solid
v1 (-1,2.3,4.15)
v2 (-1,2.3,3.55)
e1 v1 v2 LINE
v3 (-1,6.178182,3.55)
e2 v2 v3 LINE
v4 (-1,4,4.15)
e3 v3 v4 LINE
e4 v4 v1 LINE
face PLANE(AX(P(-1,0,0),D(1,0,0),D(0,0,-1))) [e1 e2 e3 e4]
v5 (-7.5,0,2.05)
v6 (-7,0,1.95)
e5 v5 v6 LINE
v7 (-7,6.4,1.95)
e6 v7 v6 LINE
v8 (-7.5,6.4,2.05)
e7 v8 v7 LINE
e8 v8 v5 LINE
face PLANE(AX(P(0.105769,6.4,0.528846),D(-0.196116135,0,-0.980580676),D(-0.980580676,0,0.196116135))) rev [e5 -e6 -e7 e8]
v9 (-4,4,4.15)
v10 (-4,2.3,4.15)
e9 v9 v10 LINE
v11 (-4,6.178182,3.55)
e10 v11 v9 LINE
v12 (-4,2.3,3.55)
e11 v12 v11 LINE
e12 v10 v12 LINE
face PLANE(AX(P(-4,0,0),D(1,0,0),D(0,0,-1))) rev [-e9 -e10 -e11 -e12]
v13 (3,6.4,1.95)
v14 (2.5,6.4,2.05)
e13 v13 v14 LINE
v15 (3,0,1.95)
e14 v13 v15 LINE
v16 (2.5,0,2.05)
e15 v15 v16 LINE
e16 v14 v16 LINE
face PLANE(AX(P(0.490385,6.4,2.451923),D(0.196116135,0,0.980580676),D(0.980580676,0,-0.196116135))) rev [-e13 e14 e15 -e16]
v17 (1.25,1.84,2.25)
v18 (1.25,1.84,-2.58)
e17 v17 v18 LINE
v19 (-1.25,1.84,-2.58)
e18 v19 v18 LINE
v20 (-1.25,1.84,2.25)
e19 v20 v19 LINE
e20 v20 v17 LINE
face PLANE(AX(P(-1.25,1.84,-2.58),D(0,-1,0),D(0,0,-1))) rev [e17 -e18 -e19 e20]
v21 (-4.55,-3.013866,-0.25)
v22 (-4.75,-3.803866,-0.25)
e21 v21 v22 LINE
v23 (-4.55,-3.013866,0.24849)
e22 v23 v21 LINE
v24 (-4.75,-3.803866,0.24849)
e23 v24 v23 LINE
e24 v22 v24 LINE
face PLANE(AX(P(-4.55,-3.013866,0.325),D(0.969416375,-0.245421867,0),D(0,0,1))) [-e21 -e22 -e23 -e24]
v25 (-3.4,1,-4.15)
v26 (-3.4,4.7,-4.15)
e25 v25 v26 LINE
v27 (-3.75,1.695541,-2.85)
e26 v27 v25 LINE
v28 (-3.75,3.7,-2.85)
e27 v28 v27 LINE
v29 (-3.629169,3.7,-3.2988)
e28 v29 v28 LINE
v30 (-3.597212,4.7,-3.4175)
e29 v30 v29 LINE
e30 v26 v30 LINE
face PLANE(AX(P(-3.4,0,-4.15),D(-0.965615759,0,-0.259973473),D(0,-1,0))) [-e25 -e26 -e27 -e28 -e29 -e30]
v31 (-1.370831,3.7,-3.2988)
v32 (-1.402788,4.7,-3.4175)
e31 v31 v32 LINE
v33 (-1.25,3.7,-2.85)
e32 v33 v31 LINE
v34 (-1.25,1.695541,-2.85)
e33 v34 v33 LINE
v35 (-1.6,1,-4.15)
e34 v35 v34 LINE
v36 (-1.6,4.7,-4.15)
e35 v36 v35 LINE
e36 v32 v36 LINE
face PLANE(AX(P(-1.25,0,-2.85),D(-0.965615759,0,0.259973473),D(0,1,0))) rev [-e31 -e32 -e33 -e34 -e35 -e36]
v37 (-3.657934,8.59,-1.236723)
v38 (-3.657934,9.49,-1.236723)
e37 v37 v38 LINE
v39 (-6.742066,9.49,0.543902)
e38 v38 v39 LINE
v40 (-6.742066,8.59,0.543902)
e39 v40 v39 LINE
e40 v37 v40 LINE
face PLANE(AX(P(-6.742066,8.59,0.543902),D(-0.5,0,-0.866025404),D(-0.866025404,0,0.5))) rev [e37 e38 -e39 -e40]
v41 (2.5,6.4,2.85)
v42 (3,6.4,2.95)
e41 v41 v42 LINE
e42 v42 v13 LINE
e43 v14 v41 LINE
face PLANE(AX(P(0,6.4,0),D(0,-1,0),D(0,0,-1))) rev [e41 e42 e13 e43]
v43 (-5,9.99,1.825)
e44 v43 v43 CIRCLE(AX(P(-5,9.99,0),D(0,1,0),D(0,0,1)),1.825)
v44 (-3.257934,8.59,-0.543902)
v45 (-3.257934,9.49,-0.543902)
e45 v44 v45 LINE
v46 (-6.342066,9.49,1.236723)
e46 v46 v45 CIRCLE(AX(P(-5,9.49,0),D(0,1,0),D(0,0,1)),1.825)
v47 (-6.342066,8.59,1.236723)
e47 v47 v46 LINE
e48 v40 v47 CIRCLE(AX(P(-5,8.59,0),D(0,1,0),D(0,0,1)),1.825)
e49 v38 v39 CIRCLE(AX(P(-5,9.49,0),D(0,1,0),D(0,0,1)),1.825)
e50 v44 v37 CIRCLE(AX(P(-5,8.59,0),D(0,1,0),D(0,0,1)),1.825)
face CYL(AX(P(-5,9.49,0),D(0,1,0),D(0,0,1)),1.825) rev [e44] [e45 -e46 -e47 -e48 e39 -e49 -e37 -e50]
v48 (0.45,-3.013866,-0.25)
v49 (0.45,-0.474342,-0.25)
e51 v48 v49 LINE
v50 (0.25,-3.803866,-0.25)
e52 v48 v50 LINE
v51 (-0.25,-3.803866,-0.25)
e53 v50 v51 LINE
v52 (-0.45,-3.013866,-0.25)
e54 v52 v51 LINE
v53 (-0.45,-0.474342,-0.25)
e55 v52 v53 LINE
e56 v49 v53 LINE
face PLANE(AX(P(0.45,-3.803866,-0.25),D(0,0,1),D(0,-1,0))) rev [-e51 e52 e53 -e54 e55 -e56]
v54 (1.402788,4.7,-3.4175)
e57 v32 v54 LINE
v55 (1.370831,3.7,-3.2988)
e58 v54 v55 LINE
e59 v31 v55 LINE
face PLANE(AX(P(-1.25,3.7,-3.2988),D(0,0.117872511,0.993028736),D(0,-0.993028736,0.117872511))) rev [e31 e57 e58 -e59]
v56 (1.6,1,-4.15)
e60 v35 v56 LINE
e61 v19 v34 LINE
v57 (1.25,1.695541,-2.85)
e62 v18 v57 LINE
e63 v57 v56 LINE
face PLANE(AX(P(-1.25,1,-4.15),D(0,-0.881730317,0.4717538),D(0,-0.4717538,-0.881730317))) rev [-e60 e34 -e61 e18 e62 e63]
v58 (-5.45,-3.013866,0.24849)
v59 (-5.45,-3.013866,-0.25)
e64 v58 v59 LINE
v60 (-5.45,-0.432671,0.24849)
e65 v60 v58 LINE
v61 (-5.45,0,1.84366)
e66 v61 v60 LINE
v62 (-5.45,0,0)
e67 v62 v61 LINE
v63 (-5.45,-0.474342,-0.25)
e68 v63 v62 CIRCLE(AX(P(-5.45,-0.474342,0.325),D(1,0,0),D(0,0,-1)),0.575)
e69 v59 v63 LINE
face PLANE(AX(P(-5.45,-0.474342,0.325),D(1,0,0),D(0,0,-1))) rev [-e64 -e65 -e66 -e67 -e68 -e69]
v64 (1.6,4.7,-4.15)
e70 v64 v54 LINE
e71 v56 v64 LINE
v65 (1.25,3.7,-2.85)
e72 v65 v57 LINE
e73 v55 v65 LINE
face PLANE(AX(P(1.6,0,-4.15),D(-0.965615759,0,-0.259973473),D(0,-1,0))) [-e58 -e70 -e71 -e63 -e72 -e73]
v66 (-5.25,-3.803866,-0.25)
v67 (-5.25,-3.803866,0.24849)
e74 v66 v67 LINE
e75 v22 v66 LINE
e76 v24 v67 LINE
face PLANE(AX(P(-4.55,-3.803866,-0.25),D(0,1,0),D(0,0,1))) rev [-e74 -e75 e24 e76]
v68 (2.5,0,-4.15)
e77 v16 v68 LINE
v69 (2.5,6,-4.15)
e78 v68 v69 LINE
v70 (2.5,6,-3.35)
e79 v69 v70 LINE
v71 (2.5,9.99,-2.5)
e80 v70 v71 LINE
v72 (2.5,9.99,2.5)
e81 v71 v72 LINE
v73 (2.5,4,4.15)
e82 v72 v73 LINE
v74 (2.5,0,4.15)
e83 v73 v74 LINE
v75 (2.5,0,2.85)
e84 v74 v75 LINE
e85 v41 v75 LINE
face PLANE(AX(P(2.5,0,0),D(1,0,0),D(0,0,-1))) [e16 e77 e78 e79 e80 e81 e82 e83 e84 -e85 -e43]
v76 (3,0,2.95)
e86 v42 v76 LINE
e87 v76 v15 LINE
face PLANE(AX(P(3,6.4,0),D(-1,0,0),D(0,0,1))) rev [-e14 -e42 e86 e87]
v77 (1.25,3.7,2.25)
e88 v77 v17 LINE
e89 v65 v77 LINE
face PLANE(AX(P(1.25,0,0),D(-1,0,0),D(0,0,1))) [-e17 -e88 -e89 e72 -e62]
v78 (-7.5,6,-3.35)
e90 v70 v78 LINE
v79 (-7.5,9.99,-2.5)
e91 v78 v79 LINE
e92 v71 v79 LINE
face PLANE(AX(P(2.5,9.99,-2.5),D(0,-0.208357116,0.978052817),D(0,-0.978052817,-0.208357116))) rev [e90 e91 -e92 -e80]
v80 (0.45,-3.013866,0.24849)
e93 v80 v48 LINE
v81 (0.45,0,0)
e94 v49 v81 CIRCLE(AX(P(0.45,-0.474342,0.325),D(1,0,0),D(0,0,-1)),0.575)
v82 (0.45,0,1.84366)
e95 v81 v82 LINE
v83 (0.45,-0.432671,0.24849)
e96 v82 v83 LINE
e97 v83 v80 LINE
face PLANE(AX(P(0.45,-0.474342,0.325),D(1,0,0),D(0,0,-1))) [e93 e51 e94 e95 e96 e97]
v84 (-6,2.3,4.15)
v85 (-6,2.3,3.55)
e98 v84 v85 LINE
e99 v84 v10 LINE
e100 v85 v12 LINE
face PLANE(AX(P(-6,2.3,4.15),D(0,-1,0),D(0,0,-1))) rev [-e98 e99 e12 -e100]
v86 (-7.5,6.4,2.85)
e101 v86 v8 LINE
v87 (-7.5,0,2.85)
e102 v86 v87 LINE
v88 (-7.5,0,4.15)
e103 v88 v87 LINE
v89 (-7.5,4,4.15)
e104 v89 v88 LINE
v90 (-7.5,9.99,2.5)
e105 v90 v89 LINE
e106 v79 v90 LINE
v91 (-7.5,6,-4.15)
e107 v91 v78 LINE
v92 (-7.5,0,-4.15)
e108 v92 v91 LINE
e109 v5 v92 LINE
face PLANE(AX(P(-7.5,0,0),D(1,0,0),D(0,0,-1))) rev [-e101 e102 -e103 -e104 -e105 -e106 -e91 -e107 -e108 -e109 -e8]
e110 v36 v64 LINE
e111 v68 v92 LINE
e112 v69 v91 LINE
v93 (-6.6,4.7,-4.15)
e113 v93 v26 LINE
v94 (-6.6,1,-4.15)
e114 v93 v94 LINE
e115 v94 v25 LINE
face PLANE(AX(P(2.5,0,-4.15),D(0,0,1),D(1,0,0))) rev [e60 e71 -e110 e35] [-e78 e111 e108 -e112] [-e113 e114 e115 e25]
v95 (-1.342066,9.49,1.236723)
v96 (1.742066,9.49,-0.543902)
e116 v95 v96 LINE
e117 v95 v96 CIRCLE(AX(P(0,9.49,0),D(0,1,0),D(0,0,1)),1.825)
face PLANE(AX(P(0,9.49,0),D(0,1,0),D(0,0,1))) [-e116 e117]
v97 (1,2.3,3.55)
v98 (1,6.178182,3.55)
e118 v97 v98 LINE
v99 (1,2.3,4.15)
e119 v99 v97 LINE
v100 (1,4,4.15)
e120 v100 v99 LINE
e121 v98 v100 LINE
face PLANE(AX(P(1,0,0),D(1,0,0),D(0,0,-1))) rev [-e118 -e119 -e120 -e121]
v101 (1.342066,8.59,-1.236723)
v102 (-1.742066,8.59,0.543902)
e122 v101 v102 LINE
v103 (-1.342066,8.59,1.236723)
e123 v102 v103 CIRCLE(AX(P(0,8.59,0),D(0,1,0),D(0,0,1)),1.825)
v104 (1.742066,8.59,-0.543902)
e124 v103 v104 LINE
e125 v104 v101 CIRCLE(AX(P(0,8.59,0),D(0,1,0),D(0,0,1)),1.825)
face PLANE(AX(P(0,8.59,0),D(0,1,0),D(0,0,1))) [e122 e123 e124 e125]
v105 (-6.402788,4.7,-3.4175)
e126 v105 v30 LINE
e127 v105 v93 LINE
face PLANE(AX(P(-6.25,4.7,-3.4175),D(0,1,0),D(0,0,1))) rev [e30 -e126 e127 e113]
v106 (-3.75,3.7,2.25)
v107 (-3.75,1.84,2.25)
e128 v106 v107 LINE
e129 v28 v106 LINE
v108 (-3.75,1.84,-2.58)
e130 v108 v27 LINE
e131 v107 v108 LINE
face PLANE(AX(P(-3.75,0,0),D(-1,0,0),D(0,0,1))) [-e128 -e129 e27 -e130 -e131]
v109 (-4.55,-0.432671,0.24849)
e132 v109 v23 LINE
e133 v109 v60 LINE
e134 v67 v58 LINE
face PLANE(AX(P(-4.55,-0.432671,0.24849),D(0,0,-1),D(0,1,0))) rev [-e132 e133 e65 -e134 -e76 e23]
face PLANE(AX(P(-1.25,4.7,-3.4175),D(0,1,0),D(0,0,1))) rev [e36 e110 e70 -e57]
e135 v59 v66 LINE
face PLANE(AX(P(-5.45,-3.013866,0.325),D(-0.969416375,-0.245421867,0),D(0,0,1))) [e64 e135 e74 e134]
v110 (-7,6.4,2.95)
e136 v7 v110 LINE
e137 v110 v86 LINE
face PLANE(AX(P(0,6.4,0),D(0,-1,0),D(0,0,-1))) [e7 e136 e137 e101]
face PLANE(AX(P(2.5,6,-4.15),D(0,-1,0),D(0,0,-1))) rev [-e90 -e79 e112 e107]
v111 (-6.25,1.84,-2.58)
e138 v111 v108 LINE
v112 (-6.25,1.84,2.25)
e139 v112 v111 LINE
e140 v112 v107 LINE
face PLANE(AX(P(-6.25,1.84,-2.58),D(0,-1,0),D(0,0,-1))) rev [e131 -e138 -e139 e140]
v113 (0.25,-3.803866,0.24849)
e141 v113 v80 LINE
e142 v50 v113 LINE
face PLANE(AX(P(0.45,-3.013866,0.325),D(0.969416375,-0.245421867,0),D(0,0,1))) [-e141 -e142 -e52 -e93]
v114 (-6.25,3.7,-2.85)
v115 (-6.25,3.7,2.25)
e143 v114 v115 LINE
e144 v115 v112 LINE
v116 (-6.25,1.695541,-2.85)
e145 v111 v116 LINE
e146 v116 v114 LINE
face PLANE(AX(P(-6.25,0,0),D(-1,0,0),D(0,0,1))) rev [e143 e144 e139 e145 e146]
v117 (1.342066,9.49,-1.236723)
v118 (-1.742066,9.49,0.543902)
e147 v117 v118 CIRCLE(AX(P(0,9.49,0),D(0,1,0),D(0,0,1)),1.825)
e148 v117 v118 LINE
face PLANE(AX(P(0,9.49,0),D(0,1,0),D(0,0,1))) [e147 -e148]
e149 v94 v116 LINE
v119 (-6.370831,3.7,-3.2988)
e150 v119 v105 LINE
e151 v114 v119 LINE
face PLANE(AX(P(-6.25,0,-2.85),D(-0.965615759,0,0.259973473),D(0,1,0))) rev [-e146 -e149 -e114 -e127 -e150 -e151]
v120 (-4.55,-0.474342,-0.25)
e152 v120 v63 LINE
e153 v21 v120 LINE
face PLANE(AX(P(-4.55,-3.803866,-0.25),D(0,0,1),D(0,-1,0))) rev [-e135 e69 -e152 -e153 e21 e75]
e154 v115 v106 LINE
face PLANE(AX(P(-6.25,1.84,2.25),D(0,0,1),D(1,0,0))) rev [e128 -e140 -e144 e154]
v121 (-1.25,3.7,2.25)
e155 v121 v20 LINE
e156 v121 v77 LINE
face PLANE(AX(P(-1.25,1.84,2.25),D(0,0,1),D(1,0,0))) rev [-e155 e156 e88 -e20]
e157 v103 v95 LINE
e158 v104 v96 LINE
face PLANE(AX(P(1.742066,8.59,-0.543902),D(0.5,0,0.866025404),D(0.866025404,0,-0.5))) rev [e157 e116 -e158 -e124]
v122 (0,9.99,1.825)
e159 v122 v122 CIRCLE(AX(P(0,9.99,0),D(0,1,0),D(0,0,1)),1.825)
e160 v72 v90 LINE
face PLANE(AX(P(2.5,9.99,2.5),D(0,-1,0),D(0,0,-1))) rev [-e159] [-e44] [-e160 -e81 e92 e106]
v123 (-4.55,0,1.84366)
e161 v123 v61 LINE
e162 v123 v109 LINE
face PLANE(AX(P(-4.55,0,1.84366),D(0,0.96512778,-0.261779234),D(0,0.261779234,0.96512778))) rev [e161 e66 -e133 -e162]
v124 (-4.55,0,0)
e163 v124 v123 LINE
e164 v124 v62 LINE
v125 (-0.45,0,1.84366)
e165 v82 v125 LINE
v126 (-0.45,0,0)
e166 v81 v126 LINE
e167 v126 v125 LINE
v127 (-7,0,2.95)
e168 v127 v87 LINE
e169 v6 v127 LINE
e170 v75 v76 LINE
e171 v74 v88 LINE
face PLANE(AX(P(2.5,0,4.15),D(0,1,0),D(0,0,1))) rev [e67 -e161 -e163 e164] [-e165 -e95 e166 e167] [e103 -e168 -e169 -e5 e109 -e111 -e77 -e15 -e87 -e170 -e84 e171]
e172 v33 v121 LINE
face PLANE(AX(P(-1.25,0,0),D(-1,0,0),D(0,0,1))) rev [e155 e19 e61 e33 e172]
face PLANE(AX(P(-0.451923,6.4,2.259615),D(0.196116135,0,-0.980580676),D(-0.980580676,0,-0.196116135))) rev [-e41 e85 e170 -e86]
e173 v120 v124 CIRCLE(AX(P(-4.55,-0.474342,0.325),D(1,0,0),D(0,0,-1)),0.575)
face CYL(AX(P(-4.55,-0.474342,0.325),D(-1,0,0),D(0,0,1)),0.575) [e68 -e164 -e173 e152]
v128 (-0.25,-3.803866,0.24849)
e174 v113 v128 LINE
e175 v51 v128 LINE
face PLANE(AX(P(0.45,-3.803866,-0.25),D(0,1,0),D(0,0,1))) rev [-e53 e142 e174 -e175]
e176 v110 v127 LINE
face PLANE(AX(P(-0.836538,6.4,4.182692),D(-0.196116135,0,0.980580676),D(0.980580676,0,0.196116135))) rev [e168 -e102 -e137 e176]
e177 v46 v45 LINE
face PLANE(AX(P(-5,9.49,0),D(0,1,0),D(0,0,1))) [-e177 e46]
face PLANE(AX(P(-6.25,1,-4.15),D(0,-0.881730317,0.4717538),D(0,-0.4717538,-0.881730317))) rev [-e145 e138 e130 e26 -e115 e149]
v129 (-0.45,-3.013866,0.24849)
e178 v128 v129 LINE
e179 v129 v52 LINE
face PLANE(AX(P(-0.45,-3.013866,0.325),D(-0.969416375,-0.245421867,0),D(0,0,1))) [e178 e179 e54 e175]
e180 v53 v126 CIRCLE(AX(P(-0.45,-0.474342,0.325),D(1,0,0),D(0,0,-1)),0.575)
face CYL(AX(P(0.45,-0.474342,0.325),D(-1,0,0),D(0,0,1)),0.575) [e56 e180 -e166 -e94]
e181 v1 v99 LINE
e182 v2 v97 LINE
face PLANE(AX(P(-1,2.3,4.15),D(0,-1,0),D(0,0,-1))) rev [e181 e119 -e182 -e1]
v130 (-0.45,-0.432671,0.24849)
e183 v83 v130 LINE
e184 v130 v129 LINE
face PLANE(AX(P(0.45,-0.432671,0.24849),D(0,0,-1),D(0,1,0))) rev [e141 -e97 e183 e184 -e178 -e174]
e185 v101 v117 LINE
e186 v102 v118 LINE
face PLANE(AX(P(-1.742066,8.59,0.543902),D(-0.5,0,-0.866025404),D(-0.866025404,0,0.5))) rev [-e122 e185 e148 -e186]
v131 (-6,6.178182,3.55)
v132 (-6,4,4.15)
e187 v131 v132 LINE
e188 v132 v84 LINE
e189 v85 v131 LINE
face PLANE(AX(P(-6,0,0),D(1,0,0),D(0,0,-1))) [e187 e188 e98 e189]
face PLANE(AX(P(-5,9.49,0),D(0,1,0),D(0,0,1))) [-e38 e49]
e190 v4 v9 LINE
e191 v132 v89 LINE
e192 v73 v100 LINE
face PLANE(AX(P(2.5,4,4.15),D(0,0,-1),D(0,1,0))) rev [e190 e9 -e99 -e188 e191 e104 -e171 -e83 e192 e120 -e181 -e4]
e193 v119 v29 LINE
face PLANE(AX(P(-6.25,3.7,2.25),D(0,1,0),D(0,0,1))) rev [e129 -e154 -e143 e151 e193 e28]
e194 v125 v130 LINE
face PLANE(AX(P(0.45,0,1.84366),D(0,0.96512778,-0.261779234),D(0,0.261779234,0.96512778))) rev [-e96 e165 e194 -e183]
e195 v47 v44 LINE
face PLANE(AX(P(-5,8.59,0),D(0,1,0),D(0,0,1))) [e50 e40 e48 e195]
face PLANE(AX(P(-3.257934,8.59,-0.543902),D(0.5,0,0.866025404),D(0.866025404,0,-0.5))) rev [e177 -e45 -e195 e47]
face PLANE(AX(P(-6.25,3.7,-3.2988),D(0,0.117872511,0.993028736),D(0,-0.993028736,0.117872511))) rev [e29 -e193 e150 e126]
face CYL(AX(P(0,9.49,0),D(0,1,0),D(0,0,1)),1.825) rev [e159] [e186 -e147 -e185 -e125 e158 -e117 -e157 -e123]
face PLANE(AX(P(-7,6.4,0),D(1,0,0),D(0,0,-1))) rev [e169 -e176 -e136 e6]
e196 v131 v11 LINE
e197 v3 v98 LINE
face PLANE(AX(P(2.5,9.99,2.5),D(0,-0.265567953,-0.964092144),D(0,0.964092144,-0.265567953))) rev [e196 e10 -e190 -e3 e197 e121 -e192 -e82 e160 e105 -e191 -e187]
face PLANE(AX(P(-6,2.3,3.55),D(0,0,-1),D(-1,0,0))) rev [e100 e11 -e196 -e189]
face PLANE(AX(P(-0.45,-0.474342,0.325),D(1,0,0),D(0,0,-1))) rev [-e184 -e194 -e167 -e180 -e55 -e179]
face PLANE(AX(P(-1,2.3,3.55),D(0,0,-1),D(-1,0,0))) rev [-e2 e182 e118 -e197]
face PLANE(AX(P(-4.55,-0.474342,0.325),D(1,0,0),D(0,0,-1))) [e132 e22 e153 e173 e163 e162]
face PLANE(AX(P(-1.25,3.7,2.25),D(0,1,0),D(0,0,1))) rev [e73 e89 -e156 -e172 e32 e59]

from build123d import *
from build123d.topology import SkipClean

# Parameters (mm, degrees)
BOSS_EXTRUDE1_DEPTH = 2.5
CUT_EXTRUDE1_DEPTH  = 1.25
CHAMFER1_SIZE       = 0.35
CHAMFER1_SIZE_2     = 1.3
CUT_EXTRUDE2_DEPTH  = 1
SKETCH5_R           = 1.825
CUT_EXTRUDE3_DEPTH  = 0.5
CUT_EXTRUDE4_DEPTH  = 0.9
BOSS_EXTRUDE3_DEPTH = 0.45
CHAMFER2_SIZE       = 0.2
CHAMFER2_SIZE2      = 0.79
MIRROR1_START       = -1.36978926
MIRROR1_OUTLINE_W   = 4
MIRROR1_OUTLINE_H   = 0.498489558
MIRROR1_DEPTH       = 0.193883275
LPATTERN1_COUNT     = 2
LPATTERN1_PITCH     = 5
BOSS_EXTRUDE2_DEPTH = 6.4
CUT_EXTRUDE5_DEPTH  = 6.4


# Read off the part's stored shape, not the designer's step: Mirror1
with BuildPart() as part:
    # Sketch2 → Boss-Extrude1 (new, symmetric)
    with BuildSketch(Plane(origin=(0, 0, 0), x_dir=(0, 0, -1), z_dir=(1, 0, 0))):
        Polygon((-4.15, 4), (-4.15, 0), (4.15, 0), (4.15, 6), (3.35, 6), (2.5, 9.99), (-2.5, 9.99), align=None)
    extrude(amount=BOSS_EXTRUDE1_DEPTH, both=True)

    # Sketch3 → Cut-Extrude1 (cut, symmetric)
    with BuildSketch(Plane(origin=(0, 0, 0), x_dir=(0, 0, -1), z_dir=(1, 0, 0))):
        Polygon((4.15, 1), (2.58, 1.84), (-2.25, 1.84), (-2.25, 3.7), (3.2988, 3.7), (3.4175, 4.7), (4.15, 4.7), align=None)
    extrude(amount=CUT_EXTRUDE1_DEPTH, both=True, mode=Mode.SUBTRACT)

    # Chamfer1
    # the kernel refuses this chamfer: 1.3, 0.35 mm, written as the material it takes off along each edge
    with BuildSketch(Plane(origin=(1.25, 4.7, -4.15), x_dir=(0.9905947308102195, 0, -0.1368286493795385), z_dir=(0, -1, 0))) as chamfer1_piece_1_section:
        Polygon((CHAMFER1_SIZE * 0.99059473081, CHAMFER1_SIZE * 0.13682864938), (-CHAMFER1_SIZE_2 * 0.13682864938, CHAMFER1_SIZE_2 * 0.99059473081), (0, 0), align=None)
    chamfer1_piece_1 = extrude(amount=7.075699234, mode=Mode.PRIVATE)
    chamfer1_piece_1 = split(chamfer1_piece_1, bisect_by=Plane(origin=(1.398374335, 1.802145787, -2.650751327), z_dir=(0, 0.8817303170442501, -0.47175380020201896)), keep=Keep.TOP, mode=Mode.PRIVATE)
    chamfer1_piece_1 = split(chamfer1_piece_1, bisect_by=Plane(origin=(1.398374335, 4.303686728, -3.370457615), z_dir=(0, -0.11787251100077023, -0.9930287363165143)), keep=Keep.TOP, mode=Mode.PRIVATE)
    add(chamfer1_piece_1, mode=Mode.SUBTRACT)
    with BuildSketch(Plane(origin=(1.25, 8.075699234, -4.15), x_dir=(0.9905947308102195, 0, -0.1368286493795385), z_dir=(0, -1, 0))) as chamfer1_piece_2_section:
        Polygon((CHAMFER1_SIZE * 0.99059473081, CHAMFER1_SIZE * 0.13682864938), (-CHAMFER1_SIZE_2 * 0.13682864938, CHAMFER1_SIZE_2 * 0.99059473081), (0, 0), align=None)
    chamfer1_piece_2 = extrude(amount=10.451398467, mode=Mode.PRIVATE)
    chamfer1_piece_2 = split(chamfer1_piece_2, bisect_by=Plane(origin=(1.281910217, 1.867643019, -2.528333882), z_dir=(0, 0.8817303170442501, -0.47175380020201896)), keep=Keep.TOP, mode=Mode.PRIVATE)
    chamfer1_piece_2 = split(chamfer1_piece_2, bisect_by=Plane(origin=(1.281910217, 3.7, -3.087047323), z_dir=(0, -1, 0)), keep=Keep.TOP, mode=Mode.PRIVATE)
    add(chamfer1_piece_2, mode=Mode.SUBTRACT)
    with BuildSketch(Plane(origin=(-1.25, 4.7, -4.15), x_dir=(-0.9905947308102195, 0, -0.1368286493795385), z_dir=(0, -1, 0))) as chamfer1_piece_3_section:
        Polygon((CHAMFER1_SIZE * 0.99059473081, -CHAMFER1_SIZE * 0.13682864938), (-CHAMFER1_SIZE_2 * 0.13682864938, -CHAMFER1_SIZE_2 * 0.99059473081), (0, 0), align=None)
    chamfer1_piece_3 = extrude(amount=7.075699234, mode=Mode.PRIVATE)
    chamfer1_piece_3 = split(chamfer1_piece_3, bisect_by=Plane(origin=(-1.398374335, 1.802145787, -2.650751327), z_dir=(0, 0.8817303170442501, -0.47175380020201896)), keep=Keep.TOP, mode=Mode.PRIVATE)
    chamfer1_piece_3 = split(chamfer1_piece_3, bisect_by=Plane(origin=(-1.398374335, 4.303686728, -3.370457615), z_dir=(0, -0.11787251100077023, -0.9930287363165143)), keep=Keep.TOP, mode=Mode.PRIVATE)
    add(chamfer1_piece_3, mode=Mode.SUBTRACT)
    with BuildSketch(Plane(origin=(-1.25, 8.075699234, -4.15), x_dir=(-0.9905947308102195, 0, -0.1368286493795385), z_dir=(0, -1, 0))) as chamfer1_piece_4_section:
        Polygon((CHAMFER1_SIZE * 0.99059473081, -CHAMFER1_SIZE * 0.13682864938), (-CHAMFER1_SIZE_2 * 0.13682864938, -CHAMFER1_SIZE_2 * 0.99059473081), (0, 0), align=None)
    chamfer1_piece_4 = extrude(amount=10.451398467, mode=Mode.PRIVATE)
    chamfer1_piece_4 = split(chamfer1_piece_4, bisect_by=Plane(origin=(-1.281910217, 1.867643019, -2.528333882), z_dir=(0, 0.8817303170442501, -0.47175380020201896)), keep=Keep.TOP, mode=Mode.PRIVATE)
    chamfer1_piece_4 = split(chamfer1_piece_4, bisect_by=Plane(origin=(-1.281910217, 3.7, -3.087047323), z_dir=(0, -1, 0)), keep=Keep.TOP, mode=Mode.PRIVATE)
    add(chamfer1_piece_4, mode=Mode.SUBTRACT)

    # Sketch4 → Cut-Extrude2 (cut, symmetric)
    with BuildSketch(Plane(origin=(0, 0, 0), x_dir=(0, 0, -1), z_dir=(1, 0, 0))):
        Polygon((-4.15, 2.3), (-3.55, 2.3), (-3.55, 6.178181818), (-4.15, 4), align=None)
    extrude(amount=CUT_EXTRUDE2_DEPTH, both=True, mode=Mode.SUBTRACT)

    # Sketch5 → Cut-Extrude3 (cut)
    with BuildSketch(Plane(origin=(0, 9.99, 0), x_dir=(1, 0, 0), z_dir=(0, 1, 0))):
        with Locations(Location((0, 0, 0), (0, 0, 270))):
            Circle(SKETCH5_R)
    extrude(amount=-CUT_EXTRUDE3_DEPTH, mode=Mode.SUBTRACT)

    # Sketch6 → Cut-Extrude4 (cut)
    with SkipClean():  # the faces are left unmerged after this step: merging them gives an invalid solid
        with BuildSketch(Plane(origin=(0, 9.49, 0), x_dir=(1, 0, 0), z_dir=(0, 1, 0))):
            with BuildLine():
                Line((-1.74206639, -0.543902284), (1.34206639, 1.236722607))
                ThreePointArc((1.34206639, 1.236722607), (1.580496362, 0.9125), (1.74206639, 0.543902284))
                Line((1.74206639, 0.543902284), (-1.34206639, -1.236722607))
                ThreePointArc((-1.34206639, -1.236722607), (-1.580496362, -0.9125), (-1.74206639, -0.543902284))
            make_face()
        extrude(amount=-CUT_EXTRUDE4_DEPTH, mode=Mode.SUBTRACT)

    # Sketch9 → Boss-Extrude3 (add, symmetric)
    with SkipClean():  # the faces are left unmerged after this step: merging them gives an invalid solid
        with BuildSketch(Plane(origin=(0, 0, 0), x_dir=(0, 0, -1), z_dir=(1, 0, 0))):
            with BuildLine():
                Line((0.25, -3.803865983), (-0.248489558, -3.803865983))
                Line((-0.248489558, -3.803865983), (-0.248489558, -0.432670696))
                Line((-0.248489558, -0.432670696), (-1.843660044, 0))
                Line((-1.843660044, 0), (0, 0))
                ThreePointArc((0, 0), (0.183674749, -0.206246517), (0.25, -0.474341649))
                Line((0.25, -0.474341649), (0.25, -3.803865983))
            make_face()
        extrude(amount=BOSS_EXTRUDE3_DEPTH, both=True)

    # Chamfer2
    chamfer2_edges = [part.edges().sort_by_distance(p)[0] for p in [
        (0.45, -3.803865983, -0.000755221),
    ]]
    chamfer2_side = [part.faces().sort_by_distance(p)[0] for p in [
        (0, -3.803865983, -0.000755221),
    ]]
    chamfer(chamfer2_edges, length=CHAMFER2_SIZE, length2=CHAMFER2_SIZE2, reference=chamfer2_side[0])

    # Mirror1 outline → Mirror1 (cut)
    with SkipClean():  # the faces are left unmerged after this step: merging them gives an invalid solid
        with BuildSketch(Plane(origin=(0, 0, 0), x_dir=(-0.2454218669703849, 0.9694163745330335, 0), z_dir=(0.9694163745330335, 0.2454218669703849, 0)).offset(MIRROR1_START)):
            with Locations((-3, -0.000755221)):
                Rectangle(MIRROR1_OUTLINE_W, MIRROR1_OUTLINE_H)
        extrude(amount=MIRROR1_DEPTH, mode=Mode.SUBTRACT)


with BuildPart() as lpattern1_1:
    # LPattern1: pattern copy
    add(part.part.moved(Location(Vector(-1, 0, 0) * (1 * LPATTERN1_PITCH))))


with BuildPart() as part_1:
    add(part.part)

    # Combine1: union LPattern1_1
    add(lpattern1_1.part)

    # Sketch8 → Boss-Extrude2 (add)
    with SkipClean():  # the faces are left unmerged after this step: merging them gives an invalid solid
        with BuildSketch(Plane.XZ):
            Polygon((3, 2.45), (2.5, 2.45), (2.5, 2.05), (3, 1.95), align=None)
            Polygon((3, 2.95), (2.5, 2.85), (2.5, 2.45), (3, 2.45), align=None)
        extrude(amount=-BOSS_EXTRUDE2_DEPTH)

    # Sketch8<3> → Cut-Extrude5 (cut)
    with SkipClean():  # the faces are left unmerged after this step: merging them gives an invalid solid
        with BuildSketch(Plane.XZ):
            Polygon((-7, 1.95), (-7, 2.95), (-7.5, 2.85), (-7.5, 2.05), align=None)
        extrude(amount=-CUT_EXTRUDE5_DEPTH, mode=Mode.SUBTRACT)


solid = part_1.part
